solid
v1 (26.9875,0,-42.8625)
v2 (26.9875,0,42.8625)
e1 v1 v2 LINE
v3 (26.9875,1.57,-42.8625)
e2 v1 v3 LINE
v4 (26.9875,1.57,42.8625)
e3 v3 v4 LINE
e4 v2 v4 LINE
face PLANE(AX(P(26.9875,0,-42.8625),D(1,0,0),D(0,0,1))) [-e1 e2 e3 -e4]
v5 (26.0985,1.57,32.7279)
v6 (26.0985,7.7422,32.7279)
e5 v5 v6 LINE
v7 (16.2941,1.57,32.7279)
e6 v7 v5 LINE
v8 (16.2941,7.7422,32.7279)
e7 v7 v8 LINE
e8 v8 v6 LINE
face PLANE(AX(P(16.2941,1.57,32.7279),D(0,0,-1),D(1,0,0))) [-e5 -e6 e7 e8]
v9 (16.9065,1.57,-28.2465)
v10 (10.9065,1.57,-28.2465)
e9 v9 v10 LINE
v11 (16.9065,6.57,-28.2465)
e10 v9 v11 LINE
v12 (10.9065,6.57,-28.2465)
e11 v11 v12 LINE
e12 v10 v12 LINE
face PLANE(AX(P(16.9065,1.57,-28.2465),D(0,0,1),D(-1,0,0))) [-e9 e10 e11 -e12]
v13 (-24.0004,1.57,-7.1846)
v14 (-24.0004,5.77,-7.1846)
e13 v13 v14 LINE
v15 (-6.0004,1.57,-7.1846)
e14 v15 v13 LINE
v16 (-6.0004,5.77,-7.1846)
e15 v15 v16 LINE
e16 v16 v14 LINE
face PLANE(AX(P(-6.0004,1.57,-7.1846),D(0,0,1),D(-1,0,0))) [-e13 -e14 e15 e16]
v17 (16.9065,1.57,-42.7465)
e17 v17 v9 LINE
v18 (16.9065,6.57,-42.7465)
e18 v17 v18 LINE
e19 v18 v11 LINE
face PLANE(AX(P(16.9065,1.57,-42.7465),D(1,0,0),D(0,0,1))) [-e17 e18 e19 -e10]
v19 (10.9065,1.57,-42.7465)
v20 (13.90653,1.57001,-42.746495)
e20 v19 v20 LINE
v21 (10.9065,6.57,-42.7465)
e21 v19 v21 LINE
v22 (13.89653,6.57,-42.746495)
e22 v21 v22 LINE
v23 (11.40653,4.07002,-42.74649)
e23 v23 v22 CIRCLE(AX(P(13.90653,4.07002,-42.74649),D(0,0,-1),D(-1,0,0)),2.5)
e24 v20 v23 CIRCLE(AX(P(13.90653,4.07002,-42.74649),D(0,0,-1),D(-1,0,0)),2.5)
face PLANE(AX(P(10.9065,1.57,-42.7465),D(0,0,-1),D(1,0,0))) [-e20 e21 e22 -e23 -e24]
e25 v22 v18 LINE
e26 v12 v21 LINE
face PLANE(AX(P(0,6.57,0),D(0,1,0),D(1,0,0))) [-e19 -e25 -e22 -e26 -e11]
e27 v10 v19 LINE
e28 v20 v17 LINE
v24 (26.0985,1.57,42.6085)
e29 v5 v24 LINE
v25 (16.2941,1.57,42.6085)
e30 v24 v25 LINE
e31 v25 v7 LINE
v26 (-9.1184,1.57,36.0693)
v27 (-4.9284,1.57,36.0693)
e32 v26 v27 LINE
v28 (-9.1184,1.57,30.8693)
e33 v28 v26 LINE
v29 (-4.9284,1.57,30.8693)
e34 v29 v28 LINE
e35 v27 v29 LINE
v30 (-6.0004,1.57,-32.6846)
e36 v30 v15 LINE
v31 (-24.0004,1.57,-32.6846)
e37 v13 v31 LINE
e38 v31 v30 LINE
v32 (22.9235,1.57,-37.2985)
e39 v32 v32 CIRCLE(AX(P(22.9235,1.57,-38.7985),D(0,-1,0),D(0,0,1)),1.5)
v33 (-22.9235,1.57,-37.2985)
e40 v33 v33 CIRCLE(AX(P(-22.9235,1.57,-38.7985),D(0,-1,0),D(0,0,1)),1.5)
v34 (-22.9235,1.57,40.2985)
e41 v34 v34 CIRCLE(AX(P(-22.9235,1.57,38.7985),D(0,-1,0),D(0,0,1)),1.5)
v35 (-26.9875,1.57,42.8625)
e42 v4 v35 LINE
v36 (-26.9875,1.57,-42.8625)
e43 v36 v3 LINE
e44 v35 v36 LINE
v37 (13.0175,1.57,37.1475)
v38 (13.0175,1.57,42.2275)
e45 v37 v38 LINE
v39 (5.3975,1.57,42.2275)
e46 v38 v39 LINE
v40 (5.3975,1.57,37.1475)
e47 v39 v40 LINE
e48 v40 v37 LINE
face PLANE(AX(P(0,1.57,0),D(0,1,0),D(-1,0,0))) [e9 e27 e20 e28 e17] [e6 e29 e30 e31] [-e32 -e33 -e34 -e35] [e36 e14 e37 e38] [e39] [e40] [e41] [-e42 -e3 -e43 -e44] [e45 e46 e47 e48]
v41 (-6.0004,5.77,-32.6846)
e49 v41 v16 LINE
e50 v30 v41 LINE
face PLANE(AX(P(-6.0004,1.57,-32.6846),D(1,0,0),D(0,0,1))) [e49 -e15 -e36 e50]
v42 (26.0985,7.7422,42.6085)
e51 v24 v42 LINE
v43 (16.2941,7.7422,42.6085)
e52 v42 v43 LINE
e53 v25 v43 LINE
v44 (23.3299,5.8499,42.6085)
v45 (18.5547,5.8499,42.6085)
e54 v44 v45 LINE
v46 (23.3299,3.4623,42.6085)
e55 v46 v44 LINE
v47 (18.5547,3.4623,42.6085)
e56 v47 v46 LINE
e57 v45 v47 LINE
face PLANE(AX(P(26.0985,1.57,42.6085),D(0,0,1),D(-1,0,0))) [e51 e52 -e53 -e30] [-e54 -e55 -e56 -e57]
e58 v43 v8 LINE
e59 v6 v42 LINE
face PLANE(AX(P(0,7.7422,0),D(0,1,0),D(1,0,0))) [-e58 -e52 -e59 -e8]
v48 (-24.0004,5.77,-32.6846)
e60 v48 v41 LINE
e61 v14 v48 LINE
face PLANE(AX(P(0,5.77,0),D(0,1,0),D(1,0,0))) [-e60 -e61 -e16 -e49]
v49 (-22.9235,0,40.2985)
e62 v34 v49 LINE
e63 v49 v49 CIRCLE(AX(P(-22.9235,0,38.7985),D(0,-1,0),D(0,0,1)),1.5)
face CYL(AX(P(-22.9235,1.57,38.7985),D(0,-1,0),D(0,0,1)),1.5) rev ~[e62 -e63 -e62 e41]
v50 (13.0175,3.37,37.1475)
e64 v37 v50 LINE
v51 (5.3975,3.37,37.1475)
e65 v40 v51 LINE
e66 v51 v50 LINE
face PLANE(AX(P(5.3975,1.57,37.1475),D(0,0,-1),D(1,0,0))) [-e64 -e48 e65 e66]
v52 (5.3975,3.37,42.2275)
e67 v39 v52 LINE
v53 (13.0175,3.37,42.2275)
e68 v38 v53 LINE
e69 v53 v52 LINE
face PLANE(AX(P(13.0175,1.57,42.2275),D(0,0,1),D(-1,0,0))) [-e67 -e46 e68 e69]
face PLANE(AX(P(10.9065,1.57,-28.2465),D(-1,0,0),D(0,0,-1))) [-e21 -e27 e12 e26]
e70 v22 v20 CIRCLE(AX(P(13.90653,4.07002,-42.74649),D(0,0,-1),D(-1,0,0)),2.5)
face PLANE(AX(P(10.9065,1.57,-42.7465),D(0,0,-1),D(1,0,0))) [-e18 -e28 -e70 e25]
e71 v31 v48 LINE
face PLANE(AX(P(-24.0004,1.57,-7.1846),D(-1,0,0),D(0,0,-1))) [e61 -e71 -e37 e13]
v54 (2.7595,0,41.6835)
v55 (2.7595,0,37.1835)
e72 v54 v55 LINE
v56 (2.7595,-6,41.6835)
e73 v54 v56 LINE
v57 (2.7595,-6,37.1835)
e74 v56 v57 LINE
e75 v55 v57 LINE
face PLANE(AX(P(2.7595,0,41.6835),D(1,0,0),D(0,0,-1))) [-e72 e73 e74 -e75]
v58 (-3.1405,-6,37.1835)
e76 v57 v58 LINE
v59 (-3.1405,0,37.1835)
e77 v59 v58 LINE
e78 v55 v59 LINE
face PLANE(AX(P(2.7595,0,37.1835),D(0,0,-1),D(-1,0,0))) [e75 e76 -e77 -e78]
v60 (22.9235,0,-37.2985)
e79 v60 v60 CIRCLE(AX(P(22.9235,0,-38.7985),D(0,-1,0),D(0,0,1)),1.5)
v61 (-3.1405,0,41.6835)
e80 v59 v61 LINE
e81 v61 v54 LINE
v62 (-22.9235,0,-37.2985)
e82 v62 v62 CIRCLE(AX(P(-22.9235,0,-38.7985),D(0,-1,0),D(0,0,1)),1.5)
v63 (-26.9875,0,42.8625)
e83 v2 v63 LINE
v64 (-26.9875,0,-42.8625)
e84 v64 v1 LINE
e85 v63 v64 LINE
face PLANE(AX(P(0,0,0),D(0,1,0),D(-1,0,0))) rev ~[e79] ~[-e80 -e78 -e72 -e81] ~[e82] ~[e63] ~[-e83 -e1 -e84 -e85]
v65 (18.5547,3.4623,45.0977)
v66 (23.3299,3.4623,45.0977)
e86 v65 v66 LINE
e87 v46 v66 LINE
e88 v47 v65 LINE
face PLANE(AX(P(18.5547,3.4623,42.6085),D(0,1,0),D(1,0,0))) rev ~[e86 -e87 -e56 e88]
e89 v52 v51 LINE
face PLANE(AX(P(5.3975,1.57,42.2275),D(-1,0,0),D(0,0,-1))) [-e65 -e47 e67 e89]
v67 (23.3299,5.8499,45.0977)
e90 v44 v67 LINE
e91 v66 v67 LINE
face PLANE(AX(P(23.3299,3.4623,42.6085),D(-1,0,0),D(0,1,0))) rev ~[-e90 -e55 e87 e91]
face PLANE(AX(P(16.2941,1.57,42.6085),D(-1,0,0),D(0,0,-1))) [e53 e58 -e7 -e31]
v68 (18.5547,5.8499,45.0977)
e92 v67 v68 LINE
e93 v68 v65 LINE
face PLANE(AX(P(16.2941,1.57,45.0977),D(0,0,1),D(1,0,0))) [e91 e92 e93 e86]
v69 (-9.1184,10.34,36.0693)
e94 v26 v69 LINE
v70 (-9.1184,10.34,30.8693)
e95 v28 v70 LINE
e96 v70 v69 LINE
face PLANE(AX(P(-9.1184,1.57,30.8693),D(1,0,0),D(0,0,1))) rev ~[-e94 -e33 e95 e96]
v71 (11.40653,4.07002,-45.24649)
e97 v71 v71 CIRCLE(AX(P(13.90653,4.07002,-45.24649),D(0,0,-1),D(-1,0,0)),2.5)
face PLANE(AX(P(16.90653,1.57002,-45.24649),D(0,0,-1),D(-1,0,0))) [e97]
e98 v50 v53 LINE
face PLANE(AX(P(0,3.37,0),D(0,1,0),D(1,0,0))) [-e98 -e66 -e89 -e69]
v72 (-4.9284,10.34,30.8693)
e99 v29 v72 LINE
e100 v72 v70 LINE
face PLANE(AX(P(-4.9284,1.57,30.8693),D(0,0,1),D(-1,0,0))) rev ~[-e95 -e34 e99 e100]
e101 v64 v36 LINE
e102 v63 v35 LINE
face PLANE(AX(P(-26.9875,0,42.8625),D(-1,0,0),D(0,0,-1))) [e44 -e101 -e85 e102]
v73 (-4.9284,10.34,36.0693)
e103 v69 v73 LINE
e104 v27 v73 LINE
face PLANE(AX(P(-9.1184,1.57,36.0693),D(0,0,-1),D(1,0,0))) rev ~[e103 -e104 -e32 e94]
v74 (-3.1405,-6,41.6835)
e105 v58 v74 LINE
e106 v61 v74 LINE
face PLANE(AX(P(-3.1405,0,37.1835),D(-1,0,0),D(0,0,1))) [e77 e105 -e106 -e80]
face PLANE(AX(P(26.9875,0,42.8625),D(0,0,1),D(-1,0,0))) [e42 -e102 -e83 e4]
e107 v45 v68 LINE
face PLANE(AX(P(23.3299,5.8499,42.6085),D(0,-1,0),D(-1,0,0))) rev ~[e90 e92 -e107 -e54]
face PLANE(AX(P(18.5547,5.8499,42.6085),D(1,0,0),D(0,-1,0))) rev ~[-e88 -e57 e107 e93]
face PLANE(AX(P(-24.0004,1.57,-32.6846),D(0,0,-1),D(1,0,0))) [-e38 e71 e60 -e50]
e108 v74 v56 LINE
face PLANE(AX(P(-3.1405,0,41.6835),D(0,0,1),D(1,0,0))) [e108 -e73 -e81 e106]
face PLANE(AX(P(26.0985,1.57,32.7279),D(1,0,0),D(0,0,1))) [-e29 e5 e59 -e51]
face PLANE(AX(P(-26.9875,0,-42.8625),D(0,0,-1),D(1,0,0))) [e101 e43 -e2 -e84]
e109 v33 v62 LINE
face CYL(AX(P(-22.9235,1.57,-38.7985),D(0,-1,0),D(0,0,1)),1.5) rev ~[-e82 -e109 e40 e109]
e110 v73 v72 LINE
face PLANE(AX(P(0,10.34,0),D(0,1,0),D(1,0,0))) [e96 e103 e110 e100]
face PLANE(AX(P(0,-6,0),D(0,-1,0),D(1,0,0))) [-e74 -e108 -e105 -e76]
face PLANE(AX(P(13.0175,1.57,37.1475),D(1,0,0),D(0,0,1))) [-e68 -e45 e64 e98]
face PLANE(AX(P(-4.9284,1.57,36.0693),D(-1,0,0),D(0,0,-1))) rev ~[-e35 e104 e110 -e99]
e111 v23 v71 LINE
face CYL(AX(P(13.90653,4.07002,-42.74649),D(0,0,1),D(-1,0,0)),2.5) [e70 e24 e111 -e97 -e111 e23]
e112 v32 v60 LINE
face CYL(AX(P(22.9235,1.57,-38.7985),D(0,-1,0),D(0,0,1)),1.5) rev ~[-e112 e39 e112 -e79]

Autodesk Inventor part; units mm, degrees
ref_plane "YZ Plane" through (0, 0, 0) normal (1, 0, 0) x (0, 1, 0)
ref_plane "XZ Plane" through (0, 0, 0) normal (0, 1, 0) x (-1, 0, 0)
ref_plane "XY Plane" through (0, 0, 0) normal (0, 0, 1) x (1, 0, 0)
sketch "Sketch1" plane through (0, 0, 0) normal (0, 1, 0) x (-1, 0, 0)
  line L0 (-26.9875, 42.8625) -> (26.9875, 42.8625)
  line L1 (26.9875, 42.8625) -> (26.9875, -42.8625)
  line L2 (26.9875, -42.8625) -> (-26.9875, -42.8625)
  line L3 (-26.9875, -42.8625) -> (-26.9875, 42.8625)
  line L4 (-26.9875, 42.8625) -> (26.9875, -42.8625) construction
  line L5 (26.9875, 42.8625) -> (-26.9875, -42.8625) construction
  point P0 (0, 0)
  dimension "d0" = 53.975
  dimension "d1" = 85.725
extrude "Extrusion1" add sketch "Sketch1" along normal blind 1.57
sketch "Sketch2" plane through (0, 1.57, 0) normal (0, 1, 0) x (1, 0, 0)
  line L0 (-26.9875, -42.8625) -> (26.9875, -42.8625) projected
  line L1 (-26.9875, 42.8625) -> (-26.9875, -42.8625) projected
  line L2 (26.9875, 42.8625) -> (-26.9875, 42.8625) projected
  line L3 (26.9875, -42.8625) -> (26.9875, 42.8625) projected
  point P0 (0, 0)
  point P1 (-22.9235, -38.7985)
  point P2 (-22.9235, 38.7985)
  point P3 (22.9235, 38.7985)
  dimension "d4" = 4.064
  dimension "d5" = 4.064
  dimension "d6" = 4.064
  dimension "d7" = 4.064
  dimension "d8" = 4.064
  dimension "d9" = 4.064
hole "Hole1" at (-22.9235, 1.57, 38.7985) at (-22.9235, 1.57, -38.7985) at (22.9235, 1.57, -38.7985) direction (0, -1, 0) diameter 3 depth 2.54
sketch "Sketch3" plane through (0, 1.57, 0) normal (0, 1, 0) x (1, 0, 0)
  line L0 (26.9875, -42.8625) -> (26.9875, 42.8625) projected
  line L1 (26.9875, 42.8625) -> (-26.9875, 42.8625) projected
  line L2 (16.9065, 28.2465) -> (10.9065, 28.2465)
  line L3 (10.9065, 28.2465) -> (10.9065, 42.7465)
  line L4 (10.9065, 42.7465) -> (16.9065, 42.7465)
  line L5 (16.9065, 42.7465) -> (16.9065, 28.2465)
  line L6 (16.9065, 28.2465) -> (10.9065, 42.7465) construction
  line L7 (10.9065, 28.2465) -> (16.9065, 42.7465) construction
  point P0 (0, 0)
  point P1 (13.9065, 35.4965)
  dimension "d17" = 13.081
  dimension "d18" = 7.366
  dimension "d19" = 14.5
  dimension "d20" = 6
extrude "Extrusion2" add sketch "Sketch3" along normal blind 5
sketch "Sketch4" plane through (16.9065, 1.57, -42.7465) normal (0, 0, -1) x (-1, 0, 0)
  line L0 (6, 0) -> (6, 5) projected
  circle A0 centre (3, 2.5) radius 2.5
  point P0 (16.9065, -1.57)
  dimension "d23" = 5
extrude "Extrusion3" add sketch "Sketch4" along normal blind 2.5
sketch "Sketch5" plane through (0, 1.57, 0) normal (0, 1, 0) x (1, 0, 0)
  line L0 (-26.9875, -42.8625) -> (26.9875, -42.8625) projected
  line L1 (26.9875, -42.8625) -> (26.9875, 42.8625) projected
  line L2 (-4.9284, -30.8693) -> (-9.1184, -30.8693)
  line L3 (-9.1184, -30.8693) -> (-9.1184, -36.0693)
  line L4 (-9.1184, -36.0693) -> (-4.9284, -36.0693)
  line L5 (-4.9284, -36.0693) -> (-4.9284, -30.8693)
  line L6 (-4.9284, -30.8693) -> (-9.1184, -36.0693) construction
  line L7 (-9.1184, -30.8693) -> (-4.9284, -36.0693) construction
  point P0 (0, 0)
  point P1 (-7.3025, -33.9725)
  point P2 (-7.0234, -33.4693)
  dimension "d26" = 8.89
  dimension "d27" = 34.29
  dimension "d28" = 5.2
  dimension "d29" = 4.19
extrude "Extrusion4" add sketch "Sketch5" along normal blind 8.77
sketch "Sketch6" plane through (0, 1.57, 0) normal (0, 1, 0) x (1, 0, 0)
  line L0 (-6.0004, 7.1846) -> (-24.0004, 7.1846)
  line L1 (-24.0004, 7.1846) -> (-24.0004, 32.6846)
  line L2 (-24.0004, 32.6846) -> (-6.0004, 32.6846)
  line L3 (-6.0004, 32.6846) -> (-6.0004, 7.1846)
  line L4 (-6.0004, 7.1846) -> (-24.0004, 32.6846) construction
  line L5 (-24.0004, 7.1846) -> (-6.0004, 32.6846) construction
  point P0 (0, 0)
  point P1 (-15.0004, 19.9346)
  dimension "d34" = 25.5
  dimension "d35" = 18
extrude "Extrusion5" add sketch "Sketch6" along normal blind 4.2
sketch "Sketch7" plane through (0, 0, 0) normal (0, -1, 0) x (1, 0, 0)
  line L0 (2.7595, 37.1835) -> (-3.1405, 37.1835)
  line L1 (-3.1405, 37.1835) -> (-3.1405, 41.6835)
  line L2 (-3.1405, 41.6835) -> (2.7595, 41.6835)
  line L3 (2.7595, 41.6835) -> (2.7595, 37.1835)
  line L4 (2.7595, 37.1835) -> (-3.1405, 41.6835) construction
  line L5 (-3.1405, 37.1835) -> (2.7595, 41.6835) construction
  line L6 (-26.9875, 42.8625) -> (26.9875, 42.8625) projected
  line L7 (-26.9875, -42.8625) -> (-26.9875, 42.8625) projected
  line L8 (26.9875, 42.8625) -> (26.9875, -42.8625) projected
  point P0 (0, 0)
  point P1 (-0.1905, 39.4335)
  dimension "d36" = 4.5
  dimension "d37" = 5.9
  dimension "d38" = 3.429
  dimension "d40" = 27.178
extrude "Extrusion6" add sketch "Sketch7" along normal blind 6
sketch "Sketch8" plane through (0, 1.57, 0) normal (0, 1, 0) x (1, 0, 0)
  line L0 (26.0985, -42.6085) -> (16.2941, -42.6085)
  line L1 (16.2941, -42.6085) -> (16.2941, -32.7279)
  line L2 (16.2941, -32.7279) -> (26.0985, -32.7279)
  line L3 (26.0985, -32.7279) -> (26.0985, -42.6085)
  line L4 (26.0985, -42.6085) -> (16.2941, -32.7279) construction
  line L5 (16.2941, -42.6085) -> (26.0985, -32.7279) construction
  line L6 (26.9875, -42.8625) -> (26.9875, 42.8625) projected
  line L7 (-26.9875, -42.8625) -> (26.9875, -42.8625) projected
  point P0 (0, 0)
  point P1 (21.1963, -37.6682)
  dimension "d43" = 9.8044
  dimension "d44" = 9.8806
  dimension "d45" = 0.889
  dimension "d46" = 0.254
extrude "Extrusion7" add sketch "Sketch8" along normal blind 6.1722
sketch "Sketch9" plane through (16.2941, 1.57, 42.6085) normal (0, 0, 1) x (1, 0, 0)
  line L0 (0, 0) -> (0, 6.1722) projected
  line L1 (7.0358, 4.2799) -> (2.2606, 4.2799)
  line L2 (2.2606, 4.2799) -> (2.2606, 1.8923)
  line L3 (2.2606, 1.8923) -> (7.0358, 1.8923)
  line L4 (7.0358, 1.8923) -> (7.0358, 4.2799)
  line L5 (7.0358, 4.2799) -> (2.2606, 1.8923) construction
  line L6 (2.2606, 4.2799) -> (7.0358, 1.8923) construction
  line L7 (0, 6.1722) -> (9.8044, 6.1722) projected
  point P0 (-16.2941, -1.57)
  point P1 (4.6482, 3.0861)
  dimension "d52" = 3.0861
  dimension "d53" = 2.2606
extrude "Extrusion8" add sketch "Sketch9" along normal blind 2.4892
sketch "Sketch10" plane through (0, 1.57, 0) normal (0, 1, 0) x (1, 0, 0)
  line L0 (26.9875, -42.8625) -> (26.9875, 42.8625) projected
  line L1 (-26.9875, -42.8625) -> (26.9875, -42.8625) projected
  line L2 (13.0175, -42.2275) -> (5.3975, -42.2275)
  line L3 (5.3975, -42.2275) -> (5.3975, -37.1475)
  line L4 (5.3975, -37.1475) -> (13.0175, -37.1475)
  line L5 (13.0175, -37.1475) -> (13.0175, -42.2275)
  line L6 (13.0175, -42.2275) -> (5.3975, -37.1475) construction
  line L7 (5.3975, -42.2275) -> (13.0175, -37.1475) construction
  point P0 (0, 0)
  point P1 (9.2075, -39.6875)
  dimension "d56" = 17.78
  dimension "d57" = 3.175
  dimension "d58" = 7.62
  dimension "d59" = 5.08
extrude "Extrusion9" add sketch "Sketch10" along normal blind 1.8
properties part number "ECG PCB"
